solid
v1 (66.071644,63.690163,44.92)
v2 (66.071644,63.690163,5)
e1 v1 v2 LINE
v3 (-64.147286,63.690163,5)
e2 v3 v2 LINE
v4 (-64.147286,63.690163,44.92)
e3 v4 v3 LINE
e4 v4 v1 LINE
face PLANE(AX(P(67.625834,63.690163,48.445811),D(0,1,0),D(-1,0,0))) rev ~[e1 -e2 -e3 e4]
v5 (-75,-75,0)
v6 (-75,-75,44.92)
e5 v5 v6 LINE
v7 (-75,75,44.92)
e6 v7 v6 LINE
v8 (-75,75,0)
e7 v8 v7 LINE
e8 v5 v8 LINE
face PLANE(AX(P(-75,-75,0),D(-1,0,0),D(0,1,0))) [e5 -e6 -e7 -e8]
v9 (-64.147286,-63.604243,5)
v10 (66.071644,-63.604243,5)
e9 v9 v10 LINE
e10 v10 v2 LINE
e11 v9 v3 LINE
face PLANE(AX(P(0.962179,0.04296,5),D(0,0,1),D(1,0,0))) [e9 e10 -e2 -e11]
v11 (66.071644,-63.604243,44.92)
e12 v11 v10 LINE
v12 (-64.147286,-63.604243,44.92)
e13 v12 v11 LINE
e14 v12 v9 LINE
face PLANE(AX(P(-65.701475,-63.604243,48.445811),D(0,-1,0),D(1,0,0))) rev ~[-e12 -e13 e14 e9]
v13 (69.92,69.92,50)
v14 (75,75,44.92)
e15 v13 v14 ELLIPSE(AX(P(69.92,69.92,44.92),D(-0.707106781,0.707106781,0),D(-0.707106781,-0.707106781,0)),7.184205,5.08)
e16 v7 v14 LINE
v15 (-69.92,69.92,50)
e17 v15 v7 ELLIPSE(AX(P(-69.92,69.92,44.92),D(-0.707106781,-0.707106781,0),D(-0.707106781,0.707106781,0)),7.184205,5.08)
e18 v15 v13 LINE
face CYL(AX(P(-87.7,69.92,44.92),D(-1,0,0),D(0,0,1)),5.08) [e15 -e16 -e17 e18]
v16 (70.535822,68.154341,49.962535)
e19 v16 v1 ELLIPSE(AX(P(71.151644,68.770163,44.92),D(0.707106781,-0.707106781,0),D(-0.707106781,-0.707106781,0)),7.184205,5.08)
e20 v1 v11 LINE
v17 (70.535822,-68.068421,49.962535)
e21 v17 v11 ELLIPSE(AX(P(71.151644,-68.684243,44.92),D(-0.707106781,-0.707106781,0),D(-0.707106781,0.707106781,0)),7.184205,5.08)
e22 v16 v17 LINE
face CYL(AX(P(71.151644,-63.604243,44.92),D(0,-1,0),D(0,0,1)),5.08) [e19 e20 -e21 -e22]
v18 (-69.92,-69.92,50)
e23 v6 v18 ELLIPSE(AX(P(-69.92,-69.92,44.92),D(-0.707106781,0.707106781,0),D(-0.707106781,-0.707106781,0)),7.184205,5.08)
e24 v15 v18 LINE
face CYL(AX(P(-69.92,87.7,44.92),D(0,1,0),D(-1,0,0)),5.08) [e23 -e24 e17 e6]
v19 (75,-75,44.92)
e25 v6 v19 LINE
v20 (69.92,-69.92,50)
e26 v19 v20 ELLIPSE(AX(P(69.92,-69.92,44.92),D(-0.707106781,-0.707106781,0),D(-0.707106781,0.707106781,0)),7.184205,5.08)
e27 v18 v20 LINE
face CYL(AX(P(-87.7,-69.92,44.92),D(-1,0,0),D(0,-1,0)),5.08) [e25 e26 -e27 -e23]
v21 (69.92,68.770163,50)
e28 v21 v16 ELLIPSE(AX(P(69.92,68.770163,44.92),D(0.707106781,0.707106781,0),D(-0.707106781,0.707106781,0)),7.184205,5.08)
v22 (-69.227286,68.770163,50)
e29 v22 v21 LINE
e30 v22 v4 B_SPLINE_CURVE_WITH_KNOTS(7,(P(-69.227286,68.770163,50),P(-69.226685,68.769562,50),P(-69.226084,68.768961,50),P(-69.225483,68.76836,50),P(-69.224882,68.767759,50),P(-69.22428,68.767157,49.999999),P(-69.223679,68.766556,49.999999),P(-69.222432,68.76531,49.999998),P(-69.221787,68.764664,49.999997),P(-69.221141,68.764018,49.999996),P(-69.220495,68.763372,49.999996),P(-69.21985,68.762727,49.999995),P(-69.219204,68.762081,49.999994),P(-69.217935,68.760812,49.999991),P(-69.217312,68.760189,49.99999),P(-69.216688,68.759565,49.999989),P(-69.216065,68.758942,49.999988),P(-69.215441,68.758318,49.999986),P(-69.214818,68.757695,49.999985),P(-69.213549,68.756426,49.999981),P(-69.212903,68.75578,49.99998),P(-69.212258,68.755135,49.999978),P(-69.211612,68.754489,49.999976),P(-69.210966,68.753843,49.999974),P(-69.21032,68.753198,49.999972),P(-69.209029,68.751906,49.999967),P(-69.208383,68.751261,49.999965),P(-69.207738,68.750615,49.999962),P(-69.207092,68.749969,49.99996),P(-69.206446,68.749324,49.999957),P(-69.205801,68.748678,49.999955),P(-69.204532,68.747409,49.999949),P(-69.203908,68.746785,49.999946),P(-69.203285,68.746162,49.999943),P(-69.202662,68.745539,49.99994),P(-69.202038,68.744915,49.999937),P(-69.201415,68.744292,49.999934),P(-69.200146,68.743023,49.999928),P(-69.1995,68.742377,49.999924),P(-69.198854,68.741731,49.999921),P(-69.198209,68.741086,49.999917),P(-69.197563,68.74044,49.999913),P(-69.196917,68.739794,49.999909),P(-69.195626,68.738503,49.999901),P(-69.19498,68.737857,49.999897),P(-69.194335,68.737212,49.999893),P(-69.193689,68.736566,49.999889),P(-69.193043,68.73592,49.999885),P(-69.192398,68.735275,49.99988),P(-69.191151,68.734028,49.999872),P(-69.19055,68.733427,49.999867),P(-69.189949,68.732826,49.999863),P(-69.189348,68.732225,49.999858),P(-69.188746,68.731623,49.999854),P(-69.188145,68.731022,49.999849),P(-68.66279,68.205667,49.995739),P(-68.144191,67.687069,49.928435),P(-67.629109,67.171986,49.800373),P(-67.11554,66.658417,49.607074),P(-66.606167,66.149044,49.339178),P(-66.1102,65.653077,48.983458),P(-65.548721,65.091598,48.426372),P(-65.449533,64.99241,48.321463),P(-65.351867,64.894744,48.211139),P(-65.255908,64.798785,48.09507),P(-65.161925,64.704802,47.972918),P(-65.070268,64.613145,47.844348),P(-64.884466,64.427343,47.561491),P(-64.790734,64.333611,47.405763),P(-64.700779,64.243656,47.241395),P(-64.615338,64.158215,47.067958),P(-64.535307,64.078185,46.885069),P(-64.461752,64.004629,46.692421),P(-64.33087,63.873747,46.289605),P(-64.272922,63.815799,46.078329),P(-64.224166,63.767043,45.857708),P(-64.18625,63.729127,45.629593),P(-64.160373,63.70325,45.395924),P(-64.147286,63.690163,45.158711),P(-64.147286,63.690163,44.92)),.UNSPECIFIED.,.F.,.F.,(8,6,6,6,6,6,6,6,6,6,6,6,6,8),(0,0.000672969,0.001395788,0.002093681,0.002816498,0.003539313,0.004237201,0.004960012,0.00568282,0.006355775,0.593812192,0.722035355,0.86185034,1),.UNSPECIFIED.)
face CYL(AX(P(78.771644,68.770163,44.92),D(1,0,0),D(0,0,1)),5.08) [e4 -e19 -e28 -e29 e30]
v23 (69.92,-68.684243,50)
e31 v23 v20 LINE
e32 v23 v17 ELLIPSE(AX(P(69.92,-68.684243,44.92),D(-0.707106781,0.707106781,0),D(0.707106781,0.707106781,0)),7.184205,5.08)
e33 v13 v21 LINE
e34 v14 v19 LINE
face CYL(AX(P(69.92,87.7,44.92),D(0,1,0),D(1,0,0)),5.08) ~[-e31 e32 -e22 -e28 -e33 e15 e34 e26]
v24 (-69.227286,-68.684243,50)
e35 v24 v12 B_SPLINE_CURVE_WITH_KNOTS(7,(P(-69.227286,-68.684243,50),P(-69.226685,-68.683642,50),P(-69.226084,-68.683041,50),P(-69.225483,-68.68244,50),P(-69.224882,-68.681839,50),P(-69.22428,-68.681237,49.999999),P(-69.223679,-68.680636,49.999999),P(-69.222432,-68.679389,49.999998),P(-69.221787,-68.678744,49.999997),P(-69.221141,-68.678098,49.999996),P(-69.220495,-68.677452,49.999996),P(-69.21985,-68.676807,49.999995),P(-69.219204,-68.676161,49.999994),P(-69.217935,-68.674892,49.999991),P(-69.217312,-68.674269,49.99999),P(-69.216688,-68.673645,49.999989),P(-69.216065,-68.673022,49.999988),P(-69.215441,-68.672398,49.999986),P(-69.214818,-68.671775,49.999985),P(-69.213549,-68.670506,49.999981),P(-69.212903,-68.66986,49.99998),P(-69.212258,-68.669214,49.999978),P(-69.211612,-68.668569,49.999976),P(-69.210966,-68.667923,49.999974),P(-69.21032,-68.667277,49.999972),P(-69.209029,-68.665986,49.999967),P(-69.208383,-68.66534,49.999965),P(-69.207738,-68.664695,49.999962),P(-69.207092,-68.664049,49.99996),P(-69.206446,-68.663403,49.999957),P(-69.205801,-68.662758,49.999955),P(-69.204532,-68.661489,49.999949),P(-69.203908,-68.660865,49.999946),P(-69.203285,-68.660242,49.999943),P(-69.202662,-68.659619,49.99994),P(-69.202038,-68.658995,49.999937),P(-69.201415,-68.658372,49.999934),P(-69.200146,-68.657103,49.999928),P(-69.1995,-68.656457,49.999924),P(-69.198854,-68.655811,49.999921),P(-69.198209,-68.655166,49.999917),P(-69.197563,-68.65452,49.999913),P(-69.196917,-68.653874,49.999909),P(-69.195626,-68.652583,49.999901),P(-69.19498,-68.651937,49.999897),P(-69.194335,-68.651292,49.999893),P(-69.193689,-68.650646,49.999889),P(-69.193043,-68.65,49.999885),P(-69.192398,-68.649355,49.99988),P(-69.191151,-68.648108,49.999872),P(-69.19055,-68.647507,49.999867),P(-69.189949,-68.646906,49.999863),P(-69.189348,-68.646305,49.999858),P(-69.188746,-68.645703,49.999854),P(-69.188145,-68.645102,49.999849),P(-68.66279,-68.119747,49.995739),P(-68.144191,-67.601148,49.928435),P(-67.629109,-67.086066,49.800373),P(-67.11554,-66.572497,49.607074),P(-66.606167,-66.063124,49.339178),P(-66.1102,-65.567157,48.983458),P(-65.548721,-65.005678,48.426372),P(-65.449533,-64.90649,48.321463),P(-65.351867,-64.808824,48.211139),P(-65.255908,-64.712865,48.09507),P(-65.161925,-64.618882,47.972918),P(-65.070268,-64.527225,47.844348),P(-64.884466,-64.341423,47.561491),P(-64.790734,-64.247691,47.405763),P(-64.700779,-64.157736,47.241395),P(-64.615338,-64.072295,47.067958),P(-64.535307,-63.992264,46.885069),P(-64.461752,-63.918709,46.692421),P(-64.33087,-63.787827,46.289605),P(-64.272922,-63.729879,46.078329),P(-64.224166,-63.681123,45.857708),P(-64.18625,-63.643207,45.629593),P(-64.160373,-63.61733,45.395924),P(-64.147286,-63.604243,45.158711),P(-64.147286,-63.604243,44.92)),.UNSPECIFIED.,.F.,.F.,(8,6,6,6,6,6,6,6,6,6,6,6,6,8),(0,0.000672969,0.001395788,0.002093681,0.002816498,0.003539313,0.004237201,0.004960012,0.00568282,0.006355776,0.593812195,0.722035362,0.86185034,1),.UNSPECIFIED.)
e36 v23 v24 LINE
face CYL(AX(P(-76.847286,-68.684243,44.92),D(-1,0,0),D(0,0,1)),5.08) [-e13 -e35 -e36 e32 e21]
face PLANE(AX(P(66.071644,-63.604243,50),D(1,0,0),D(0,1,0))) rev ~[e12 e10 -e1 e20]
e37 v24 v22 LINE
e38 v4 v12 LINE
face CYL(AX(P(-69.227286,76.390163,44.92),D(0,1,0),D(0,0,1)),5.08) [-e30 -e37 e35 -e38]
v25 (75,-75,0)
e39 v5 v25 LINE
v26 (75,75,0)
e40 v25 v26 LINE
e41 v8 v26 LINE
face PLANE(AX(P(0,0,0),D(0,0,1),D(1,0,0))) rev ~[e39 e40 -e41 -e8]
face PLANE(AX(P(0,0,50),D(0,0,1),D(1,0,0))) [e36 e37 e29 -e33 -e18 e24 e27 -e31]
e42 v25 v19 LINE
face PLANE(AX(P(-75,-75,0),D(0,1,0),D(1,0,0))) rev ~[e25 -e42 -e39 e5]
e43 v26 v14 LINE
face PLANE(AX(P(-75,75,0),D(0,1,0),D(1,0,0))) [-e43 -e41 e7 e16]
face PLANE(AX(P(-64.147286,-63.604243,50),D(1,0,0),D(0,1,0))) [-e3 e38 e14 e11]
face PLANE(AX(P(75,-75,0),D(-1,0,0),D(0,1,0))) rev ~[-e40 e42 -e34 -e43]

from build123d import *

# Parameters (mm, degrees)
F0_W         = 150
F0_H         = 150
F1_DEPTH     = 50
F2_W         = 130.2189305425
F2_H         = 127.2944062948
F3_DEPTH     = 45
F4_T1_DEPTH  = 175.4
F4_T3_DEPTH  = 175.4
F4_T5_DEPTH  = 127.2944062948
F4_T7_DEPTH  = 130.2189305425
F4_T13_DEPTH = 142.9189305425
F4_T17_DEPTH = 139.9944062948
F4_T24_DEPTH = 139.9944062948
F4_T28_DEPTH = 142.9189305425
F4_T35_DEPTH = 139.9944062948
F4_T39_DEPTH = 142.9189305425
F4_T46_DEPTH = 139.9944062948
F4_T50_DEPTH = 142.9189305425


# Not quite as in the source:
# - a fillet or chamfer that OpenCascade refuses, or shapes differently, is made with other operations: its cross-section is extruded or revolved along the edge and cut away or added


with BuildPart() as f1:
    # F0 (on Top) → F1 (new body)
    with BuildSketch(Plane.XY):
        Rectangle(F0_W, F0_H)
    extrude(amount=F1_DEPTH)

    # F2 (on face) → F3 (cut)
    with BuildSketch(Plane.XY.offset(50)):
        with Locations((0.9621791542, 0.0429600477)):
            Rectangle(F2_W, F2_H)
    extrude(amount=-F3_DEPTH, mode=Mode.SUBTRACT)

    # F4: fillet of radius 5.08 on 8 edges, made by hand

    # F4_s2 → F4_t1 (cut)
    with BuildSketch(Plane.YZ.offset(-87.7)):
        with BuildLine():
            ThreePointArc((69.92, 50), (73.5121024484, 48.5121024484), (75, 44.92))
            Line((75, 44.92), (75, 50))
            Line((75, 50), (69.92, 50))
        make_face()
        with BuildLine():
            ThreePointArc((-75, 44.92), (-73.5121024484, 48.5121024484), (-69.92, 50))
            Line((-69.92, 50), (-75, 50))
            Line((-75, 50), (-75, 44.92))
        make_face()
    extrude(amount=F4_T1_DEPTH, mode=Mode.SUBTRACT)

    # F4_s4 → F4_t3 (cut)
    with BuildSketch(Plane.XZ.offset(-87.7)):
        with BuildLine():
            ThreePointArc((-75, 44.92), (-73.5121024484, 48.5121024484), (-69.92, 50))
            Line((-69.92, 50), (-75, 50))
            Line((-75, 50), (-75, 44.92))
        make_face()
        with BuildLine():
            ThreePointArc((75, 44.92), (73.5121024484, 48.5121024484), (69.92, 50))
            Line((69.92, 50), (75, 50))
            Line((75, 50), (75, 44.92))
        make_face()
    extrude(amount=F4_T3_DEPTH, mode=Mode.SUBTRACT)

    # F4_s6 → F4_t5 (cut)
    with BuildSketch(Plane.XZ.offset(-63.6901631951)):
        with BuildLine():
            ThreePointArc((71.1516444254, 50), (67.559541977, 48.5121024484), (66.0716444254, 44.92))
            Line((66.0716444254, 44.92), (66.0716444254, 50))
            Line((66.0716444254, 50), (71.1516444254, 50))
        make_face()
        with BuildLine():
            ThreePointArc((-69.2272861171, 50), (-65.6351836686, 48.5121024484), (-64.1472861171, 44.92))
            Line((-64.1472861171, 44.92), (-64.1472861171, 50))
            Line((-64.1472861171, 50), (-69.2272861171, 50))
        make_face()
    extrude(amount=F4_T5_DEPTH, mode=Mode.SUBTRACT)

    # F4_s8 → F4_t7 (cut)
    with BuildSketch(Plane.YZ.offset(-64.1472861171)):
        with BuildLine():
            ThreePointArc((-68.6842430997, 50), (-65.0921406513, 48.5121024484), (-63.6042430997, 44.92))
            Line((-63.6042430997, 44.92), (-63.6042430997, 50))
            Line((-63.6042430997, 50), (-68.6842430997, 50))
        make_face()
        with BuildLine():
            ThreePointArc((68.7701631951, 50), (65.1780607467, 48.5121024484), (63.6901631951, 44.92))
            Line((63.6901631951, 44.92), (63.6901631951, 50))
            Line((63.6901631951, 50), (68.7701631951, 50))
        make_face()
    extrude(amount=F4_T7_DEPTH, mode=Mode.SUBTRACT)


with BuildPart() as f4_tool11:
    # F4_s12 → F4_t13 (new body)
    with BuildSketch(Plane.YZ.offset(-64.1472861171)):
        with BuildLine():
            ThreePointArc((-68.6842430997, 50), (-65.0921406513, 48.5121024484), (-63.6042430997, 44.92))
            Line((-63.6042430997, 44.92), (-63.6042430997, 50))
            Line((-63.6042430997, 50), (-68.6842430997, 50))
        make_face()
    extrude(amount=F4_T13_DEPTH)

    split(bisect_by=Plane.YZ.offset(66.0716444254), keep=Keep.TOP)


with BuildPart() as f4_tool15:
    # F4_s16 → F4_t17 (new body)
    with BuildSketch(Plane.XZ.offset(76.3042430997)):
        with BuildLine():
            ThreePointArc((71.1516444254, 50), (67.559541977, 48.5121024484), (66.0716444254, 44.92))
            Line((66.0716444254, 44.92), (66.0716444254, 50))
            Line((66.0716444254, 50), (71.1516444254, 50))
        make_face()
    extrude(amount=-F4_T17_DEPTH)

    split(bisect_by=Plane.XZ.offset(63.6042430997), keep=Keep.TOP)


with BuildPart() as f4_tool11_1:
    add(f4_tool11.part)

    # F4_t19: intersect F4_tool15
    add(f4_tool15.part, mode=Mode.INTERSECT)


with BuildPart() as f1_1:
    add(f1.part)

    # F4_t9: cut F4_tool11
    add(f4_tool11_1.part, mode=Mode.SUBTRACT)


with BuildPart() as f4_tool22:
    # F4_s23 → F4_t24 (new body)
    with BuildSketch(Plane.XZ.offset(63.6042430997)):
        with BuildLine():
            ThreePointArc((71.1516444254, 50), (67.559541977, 48.5121024484), (66.0716444254, 44.92))
            Line((66.0716444254, 44.92), (66.0716444254, 50))
            Line((66.0716444254, 50), (71.1516444254, 50))
        make_face()
    extrude(amount=-F4_T24_DEPTH)

    split(bisect_by=Plane.XZ.offset(-63.6901631951), keep=Keep.BOTTOM)


with BuildPart() as f4_tool26:
    # F4_s27 → F4_t28 (new body)
    with BuildSketch(Plane.YZ.offset(78.7716444254)):
        with BuildLine():
            ThreePointArc((68.7701631951, 50), (65.1780607467, 48.5121024484), (63.6901631951, 44.92))
            Line((63.6901631951, 44.92), (63.6901631951, 50))
            Line((63.6901631951, 50), (68.7701631951, 50))
        make_face()
    extrude(amount=-F4_T28_DEPTH)

    split(bisect_by=Plane.YZ.offset(66.0716444254), keep=Keep.TOP)


with BuildPart() as f4_tool22_1:
    add(f4_tool22.part)

    # F4_t30: intersect F4_tool26
    add(f4_tool26.part, mode=Mode.INTERSECT)


with BuildPart() as f1_2:
    add(f1_1.part)

    # F4_t20: cut F4_tool22
    add(f4_tool22_1.part, mode=Mode.SUBTRACT)


with BuildPart() as f4_tool33:
    # F4_s34 → F4_t35 (new body)
    with BuildSketch(Plane.XZ.offset(-63.6901631951)):
        with BuildLine():
            ThreePointArc((-69.2272861171, 50), (-65.6351836686, 48.5121024484), (-64.1472861171, 44.92))
            Line((-64.1472861171, 44.92), (-64.1472861171, 50))
            Line((-64.1472861171, 50), (-69.2272861171, 50))
        make_face()
    extrude(amount=F4_T35_DEPTH)

    split(bisect_by=Plane.XZ.offset(63.6042430997), keep=Keep.TOP)


with BuildPart() as f4_tool37:
    # F4_s38 → F4_t39 (new body)
    with BuildSketch(Plane.YZ.offset(-76.8472861171)):
        with BuildLine():
            ThreePointArc((-68.6842430997, 50), (-65.0921406513, 48.5121024484), (-63.6042430997, 44.92))
            Line((-63.6042430997, 44.92), (-63.6042430997, 50))
            Line((-63.6042430997, 50), (-68.6842430997, 50))
        make_face()
    extrude(amount=F4_T39_DEPTH)

    split(bisect_by=Plane.YZ.offset(-64.1472861171), keep=Keep.BOTTOM)


with BuildPart() as f4_tool33_1:
    add(f4_tool33.part)

    # F4_t41: intersect F4_tool37
    add(f4_tool37.part, mode=Mode.INTERSECT)


with BuildPart() as f1_3:
    add(f1_2.part)

    # F4_t31: cut F4_tool33
    add(f4_tool33_1.part, mode=Mode.SUBTRACT)


with BuildPart() as f4_tool44:
    # F4_s45 → F4_t46 (new body)
    with BuildSketch(Plane.XZ.offset(-76.3901631951)):
        with BuildLine():
            ThreePointArc((-69.2272861171, 50), (-65.6351836686, 48.5121024484), (-64.1472861171, 44.92))
            Line((-64.1472861171, 44.92), (-64.1472861171, 50))
            Line((-64.1472861171, 50), (-69.2272861171, 50))
        make_face()
    extrude(amount=F4_T46_DEPTH)

    split(bisect_by=Plane.XZ.offset(-63.6901631951), keep=Keep.BOTTOM)


with BuildPart() as f4_tool48:
    # F4_s49 → F4_t50 (new body)
    with BuildSketch(Plane.YZ.offset(66.0716444254)):
        with BuildLine():
            ThreePointArc((68.7701631951, 50), (65.1780607467, 48.5121024484), (63.6901631951, 44.92))
            Line((63.6901631951, 44.92), (63.6901631951, 50))
            Line((63.6901631951, 50), (68.7701631951, 50))
        make_face()
    extrude(amount=-F4_T50_DEPTH)

    split(bisect_by=Plane.YZ.offset(-64.1472861171), keep=Keep.BOTTOM)


with BuildPart() as f4_tool44_1:
    add(f4_tool44.part)

    # F4_t52: intersect F4_tool48
    add(f4_tool48.part, mode=Mode.INTERSECT)


with BuildPart() as f1_4:
    add(f1_3.part)

    # F4_t42: cut F4_tool44
    add(f4_tool44_1.part, mode=Mode.SUBTRACT)


solid = f1_4.part
